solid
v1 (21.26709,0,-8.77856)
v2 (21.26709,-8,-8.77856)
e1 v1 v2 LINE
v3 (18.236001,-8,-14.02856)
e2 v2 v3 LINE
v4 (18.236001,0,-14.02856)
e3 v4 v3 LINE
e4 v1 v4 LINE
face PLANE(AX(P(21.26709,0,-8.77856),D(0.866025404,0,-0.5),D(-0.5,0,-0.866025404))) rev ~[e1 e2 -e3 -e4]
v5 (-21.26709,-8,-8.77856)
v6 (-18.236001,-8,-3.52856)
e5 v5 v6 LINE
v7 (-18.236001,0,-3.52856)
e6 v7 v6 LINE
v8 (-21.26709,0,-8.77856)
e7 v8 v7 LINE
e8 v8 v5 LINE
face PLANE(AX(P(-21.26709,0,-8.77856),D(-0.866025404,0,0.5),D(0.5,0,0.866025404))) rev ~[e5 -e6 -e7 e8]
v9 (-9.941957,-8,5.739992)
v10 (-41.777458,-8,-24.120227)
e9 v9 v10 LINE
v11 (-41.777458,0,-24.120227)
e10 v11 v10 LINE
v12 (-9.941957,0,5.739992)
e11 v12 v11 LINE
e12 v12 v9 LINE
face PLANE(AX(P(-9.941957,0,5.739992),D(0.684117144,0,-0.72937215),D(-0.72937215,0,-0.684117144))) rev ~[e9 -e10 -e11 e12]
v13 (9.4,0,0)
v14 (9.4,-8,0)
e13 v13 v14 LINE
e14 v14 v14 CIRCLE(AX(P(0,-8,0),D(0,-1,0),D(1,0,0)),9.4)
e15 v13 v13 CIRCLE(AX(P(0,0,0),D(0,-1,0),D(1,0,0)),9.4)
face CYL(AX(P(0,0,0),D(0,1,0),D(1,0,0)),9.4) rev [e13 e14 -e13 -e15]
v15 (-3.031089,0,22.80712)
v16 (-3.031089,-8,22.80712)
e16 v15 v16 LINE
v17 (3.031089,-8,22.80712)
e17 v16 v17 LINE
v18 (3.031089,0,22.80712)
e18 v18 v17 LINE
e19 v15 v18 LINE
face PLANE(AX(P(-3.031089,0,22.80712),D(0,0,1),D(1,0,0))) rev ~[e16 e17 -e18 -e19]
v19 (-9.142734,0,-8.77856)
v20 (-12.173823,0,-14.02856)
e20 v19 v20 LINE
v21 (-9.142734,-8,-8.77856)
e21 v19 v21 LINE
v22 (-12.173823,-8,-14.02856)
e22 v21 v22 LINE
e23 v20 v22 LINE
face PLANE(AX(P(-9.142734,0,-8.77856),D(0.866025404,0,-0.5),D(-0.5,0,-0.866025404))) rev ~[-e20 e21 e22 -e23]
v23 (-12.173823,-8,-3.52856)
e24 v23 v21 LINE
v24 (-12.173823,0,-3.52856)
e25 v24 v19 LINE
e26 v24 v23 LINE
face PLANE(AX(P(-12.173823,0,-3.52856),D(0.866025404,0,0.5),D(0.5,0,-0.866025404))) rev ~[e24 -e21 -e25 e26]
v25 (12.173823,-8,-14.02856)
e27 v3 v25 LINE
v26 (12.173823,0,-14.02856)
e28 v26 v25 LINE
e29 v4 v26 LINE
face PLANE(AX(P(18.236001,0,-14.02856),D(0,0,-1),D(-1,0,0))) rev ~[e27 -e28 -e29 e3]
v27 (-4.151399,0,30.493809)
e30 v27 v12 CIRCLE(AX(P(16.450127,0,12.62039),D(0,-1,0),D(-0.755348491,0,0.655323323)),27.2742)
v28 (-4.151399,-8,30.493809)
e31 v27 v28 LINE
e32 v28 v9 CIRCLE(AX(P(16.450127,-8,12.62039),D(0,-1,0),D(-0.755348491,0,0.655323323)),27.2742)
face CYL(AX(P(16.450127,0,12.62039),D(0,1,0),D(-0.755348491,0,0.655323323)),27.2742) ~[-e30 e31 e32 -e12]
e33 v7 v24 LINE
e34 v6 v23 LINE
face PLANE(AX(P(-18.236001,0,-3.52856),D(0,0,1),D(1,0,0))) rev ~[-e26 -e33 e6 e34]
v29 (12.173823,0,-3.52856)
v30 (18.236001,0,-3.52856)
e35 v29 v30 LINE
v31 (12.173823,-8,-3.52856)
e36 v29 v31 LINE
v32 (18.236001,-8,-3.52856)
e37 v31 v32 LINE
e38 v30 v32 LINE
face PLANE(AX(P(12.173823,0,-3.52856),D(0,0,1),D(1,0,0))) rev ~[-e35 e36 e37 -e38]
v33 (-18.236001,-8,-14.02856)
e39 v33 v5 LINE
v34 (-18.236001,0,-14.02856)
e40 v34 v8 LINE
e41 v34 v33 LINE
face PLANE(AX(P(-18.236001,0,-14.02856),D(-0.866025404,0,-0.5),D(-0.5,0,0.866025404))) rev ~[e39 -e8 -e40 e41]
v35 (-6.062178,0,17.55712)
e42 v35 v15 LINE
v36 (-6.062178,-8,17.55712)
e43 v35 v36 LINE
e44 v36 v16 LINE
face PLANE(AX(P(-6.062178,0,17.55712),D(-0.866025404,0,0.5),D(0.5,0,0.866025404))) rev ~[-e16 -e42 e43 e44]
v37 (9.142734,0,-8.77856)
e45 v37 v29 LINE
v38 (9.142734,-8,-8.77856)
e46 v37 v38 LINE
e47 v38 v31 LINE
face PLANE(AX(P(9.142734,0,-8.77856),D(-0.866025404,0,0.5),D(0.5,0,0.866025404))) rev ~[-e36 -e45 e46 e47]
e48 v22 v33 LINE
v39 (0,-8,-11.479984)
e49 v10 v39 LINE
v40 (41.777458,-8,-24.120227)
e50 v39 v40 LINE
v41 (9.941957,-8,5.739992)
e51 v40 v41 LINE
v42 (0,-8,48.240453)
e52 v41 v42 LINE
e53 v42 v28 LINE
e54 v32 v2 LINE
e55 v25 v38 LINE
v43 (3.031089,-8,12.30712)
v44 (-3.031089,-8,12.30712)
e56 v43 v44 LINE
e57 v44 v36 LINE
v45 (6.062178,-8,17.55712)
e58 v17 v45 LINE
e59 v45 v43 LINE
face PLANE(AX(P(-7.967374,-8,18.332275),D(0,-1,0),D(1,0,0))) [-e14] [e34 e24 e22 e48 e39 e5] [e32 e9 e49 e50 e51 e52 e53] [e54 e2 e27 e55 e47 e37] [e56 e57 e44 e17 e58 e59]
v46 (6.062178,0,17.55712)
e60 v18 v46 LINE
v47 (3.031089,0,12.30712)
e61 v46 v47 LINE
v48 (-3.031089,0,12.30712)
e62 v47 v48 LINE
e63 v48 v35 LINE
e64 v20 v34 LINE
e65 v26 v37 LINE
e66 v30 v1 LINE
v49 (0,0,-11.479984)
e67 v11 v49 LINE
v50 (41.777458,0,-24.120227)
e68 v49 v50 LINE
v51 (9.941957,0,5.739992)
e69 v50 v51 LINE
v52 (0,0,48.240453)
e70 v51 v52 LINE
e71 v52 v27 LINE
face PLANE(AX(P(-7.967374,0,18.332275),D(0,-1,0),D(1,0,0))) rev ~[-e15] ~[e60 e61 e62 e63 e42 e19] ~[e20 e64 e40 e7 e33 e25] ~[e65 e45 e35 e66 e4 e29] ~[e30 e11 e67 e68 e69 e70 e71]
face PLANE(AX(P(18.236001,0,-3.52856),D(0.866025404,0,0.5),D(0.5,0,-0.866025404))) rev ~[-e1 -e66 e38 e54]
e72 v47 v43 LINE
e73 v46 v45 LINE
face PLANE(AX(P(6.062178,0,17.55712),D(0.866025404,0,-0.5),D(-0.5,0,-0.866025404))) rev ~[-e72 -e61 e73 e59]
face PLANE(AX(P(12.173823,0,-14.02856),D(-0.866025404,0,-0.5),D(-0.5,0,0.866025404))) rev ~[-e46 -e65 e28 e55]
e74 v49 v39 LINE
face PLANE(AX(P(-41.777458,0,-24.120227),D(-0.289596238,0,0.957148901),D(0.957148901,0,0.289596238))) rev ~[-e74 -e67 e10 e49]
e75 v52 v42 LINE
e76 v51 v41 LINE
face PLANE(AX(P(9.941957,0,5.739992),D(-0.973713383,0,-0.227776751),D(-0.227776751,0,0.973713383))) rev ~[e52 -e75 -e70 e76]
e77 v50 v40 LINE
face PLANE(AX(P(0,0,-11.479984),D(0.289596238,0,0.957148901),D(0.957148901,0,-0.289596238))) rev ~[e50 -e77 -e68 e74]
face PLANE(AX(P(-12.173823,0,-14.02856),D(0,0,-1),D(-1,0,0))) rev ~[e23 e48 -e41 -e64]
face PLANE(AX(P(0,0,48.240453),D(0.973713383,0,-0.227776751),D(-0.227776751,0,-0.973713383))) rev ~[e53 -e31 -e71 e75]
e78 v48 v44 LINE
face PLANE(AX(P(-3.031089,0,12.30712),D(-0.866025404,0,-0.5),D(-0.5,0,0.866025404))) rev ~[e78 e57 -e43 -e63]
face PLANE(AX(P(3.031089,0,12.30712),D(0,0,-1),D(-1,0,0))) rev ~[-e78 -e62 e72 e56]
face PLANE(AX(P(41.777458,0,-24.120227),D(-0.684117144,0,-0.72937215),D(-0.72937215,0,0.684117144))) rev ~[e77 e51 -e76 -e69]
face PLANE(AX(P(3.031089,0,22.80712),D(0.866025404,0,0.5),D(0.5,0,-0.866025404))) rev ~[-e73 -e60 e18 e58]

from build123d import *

# Parameters (mm, degrees)
F0_R     = 9.4
F1_DEPTH = 8
F2_DEPTH = 8


# Not quite as in the source:
# - a feature names something its author has since deleted; it is built from what else it names


with BuildPart() as f1:
    # F0 (on Front) → F1 (new body)
    with BuildSketch(Plane.XZ):
        Polygon((-4.1513990878, 30.4938093078), (-9.9419574161, 5.7399917905), (-41.7774577923, -24.1202265024), (0, -11.4799835809), (41.7774577923, -24.1202265024), (9.9419574161, 5.7399917905), (0, 48.2404530048), align=None)
        Polygon((-12.1738227533, -14.0285603702), (-18.2360010358, -14.0285603702), (-21.267090177, -8.7785599753), (-18.2360010358, -3.5285595804), (-12.1738227533, -3.5285595804), (-9.1427336121, -8.7785599753), align=None, mode=Mode.SUBTRACT)
        Polygon((18.2360010358, -3.5285595804), (21.267090177, -8.7785599753), (18.2360010358, -14.0285603702), (12.1738227533, -14.0285603702), (9.1427336121, -8.7785599753), (12.1738227533, -3.5285595804), align=None, mode=Mode.SUBTRACT)
        Circle(F0_R, mode=Mode.SUBTRACT)
        Polygon((6.0621782825, 17.5571199507), (3.0310891412, 12.3071195558), (-3.0310891412, 12.3071195558), (-6.0621782825, 17.5571199507), (-3.0310891412, 22.8071203455), (3.0310891412, 22.8071203455), align=None, mode=Mode.SUBTRACT)
    extrude(amount=F1_DEPTH)

    # F0 (on Front) → F2 (join)
    with BuildSketch(Plane.XZ):
        with BuildLine():
            ThreePointArc((-4.1513990878, 30.4938093078), (-10.107126805, 18.8328186432), (-9.9419574161, 5.7399917905))
            Line((-9.9419574161, 5.7399917905), (-4.1513990878, 30.4938093078))
        make_face()
        Polygon((-4.1513990878, 30.4938093078), (-9.9419574161, 5.7399917905), (-41.7774577923, -24.1202265024), (0, -11.4799835809), (41.7774577923, -24.1202265024), (9.9419574161, 5.7399917905), (0, 48.2404530048), align=None)
        Polygon((-12.1738227533, -14.0285603702), (-18.2360010358, -14.0285603702), (-21.267090177, -8.7785599753), (-18.2360010358, -3.5285595804), (-12.1738227533, -3.5285595804), (-9.1427336121, -8.7785599753), align=None, mode=Mode.SUBTRACT)
        Polygon((18.2360010358, -3.5285595804), (21.267090177, -8.7785599753), (18.2360010358, -14.0285603702), (12.1738227533, -14.0285603702), (9.1427336121, -8.7785599753), (12.1738227533, -3.5285595804), align=None, mode=Mode.SUBTRACT)
        Circle(F0_R, mode=Mode.SUBTRACT)
        Polygon((6.0621782825, 17.5571199507), (3.0310891412, 12.3071195558), (-3.0310891412, 12.3071195558), (-6.0621782825, 17.5571199507), (-3.0310891412, 22.8071203455), (3.0310891412, 22.8071203455), align=None, mode=Mode.SUBTRACT)
    extrude(amount=F2_DEPTH)


solid = f1.part
